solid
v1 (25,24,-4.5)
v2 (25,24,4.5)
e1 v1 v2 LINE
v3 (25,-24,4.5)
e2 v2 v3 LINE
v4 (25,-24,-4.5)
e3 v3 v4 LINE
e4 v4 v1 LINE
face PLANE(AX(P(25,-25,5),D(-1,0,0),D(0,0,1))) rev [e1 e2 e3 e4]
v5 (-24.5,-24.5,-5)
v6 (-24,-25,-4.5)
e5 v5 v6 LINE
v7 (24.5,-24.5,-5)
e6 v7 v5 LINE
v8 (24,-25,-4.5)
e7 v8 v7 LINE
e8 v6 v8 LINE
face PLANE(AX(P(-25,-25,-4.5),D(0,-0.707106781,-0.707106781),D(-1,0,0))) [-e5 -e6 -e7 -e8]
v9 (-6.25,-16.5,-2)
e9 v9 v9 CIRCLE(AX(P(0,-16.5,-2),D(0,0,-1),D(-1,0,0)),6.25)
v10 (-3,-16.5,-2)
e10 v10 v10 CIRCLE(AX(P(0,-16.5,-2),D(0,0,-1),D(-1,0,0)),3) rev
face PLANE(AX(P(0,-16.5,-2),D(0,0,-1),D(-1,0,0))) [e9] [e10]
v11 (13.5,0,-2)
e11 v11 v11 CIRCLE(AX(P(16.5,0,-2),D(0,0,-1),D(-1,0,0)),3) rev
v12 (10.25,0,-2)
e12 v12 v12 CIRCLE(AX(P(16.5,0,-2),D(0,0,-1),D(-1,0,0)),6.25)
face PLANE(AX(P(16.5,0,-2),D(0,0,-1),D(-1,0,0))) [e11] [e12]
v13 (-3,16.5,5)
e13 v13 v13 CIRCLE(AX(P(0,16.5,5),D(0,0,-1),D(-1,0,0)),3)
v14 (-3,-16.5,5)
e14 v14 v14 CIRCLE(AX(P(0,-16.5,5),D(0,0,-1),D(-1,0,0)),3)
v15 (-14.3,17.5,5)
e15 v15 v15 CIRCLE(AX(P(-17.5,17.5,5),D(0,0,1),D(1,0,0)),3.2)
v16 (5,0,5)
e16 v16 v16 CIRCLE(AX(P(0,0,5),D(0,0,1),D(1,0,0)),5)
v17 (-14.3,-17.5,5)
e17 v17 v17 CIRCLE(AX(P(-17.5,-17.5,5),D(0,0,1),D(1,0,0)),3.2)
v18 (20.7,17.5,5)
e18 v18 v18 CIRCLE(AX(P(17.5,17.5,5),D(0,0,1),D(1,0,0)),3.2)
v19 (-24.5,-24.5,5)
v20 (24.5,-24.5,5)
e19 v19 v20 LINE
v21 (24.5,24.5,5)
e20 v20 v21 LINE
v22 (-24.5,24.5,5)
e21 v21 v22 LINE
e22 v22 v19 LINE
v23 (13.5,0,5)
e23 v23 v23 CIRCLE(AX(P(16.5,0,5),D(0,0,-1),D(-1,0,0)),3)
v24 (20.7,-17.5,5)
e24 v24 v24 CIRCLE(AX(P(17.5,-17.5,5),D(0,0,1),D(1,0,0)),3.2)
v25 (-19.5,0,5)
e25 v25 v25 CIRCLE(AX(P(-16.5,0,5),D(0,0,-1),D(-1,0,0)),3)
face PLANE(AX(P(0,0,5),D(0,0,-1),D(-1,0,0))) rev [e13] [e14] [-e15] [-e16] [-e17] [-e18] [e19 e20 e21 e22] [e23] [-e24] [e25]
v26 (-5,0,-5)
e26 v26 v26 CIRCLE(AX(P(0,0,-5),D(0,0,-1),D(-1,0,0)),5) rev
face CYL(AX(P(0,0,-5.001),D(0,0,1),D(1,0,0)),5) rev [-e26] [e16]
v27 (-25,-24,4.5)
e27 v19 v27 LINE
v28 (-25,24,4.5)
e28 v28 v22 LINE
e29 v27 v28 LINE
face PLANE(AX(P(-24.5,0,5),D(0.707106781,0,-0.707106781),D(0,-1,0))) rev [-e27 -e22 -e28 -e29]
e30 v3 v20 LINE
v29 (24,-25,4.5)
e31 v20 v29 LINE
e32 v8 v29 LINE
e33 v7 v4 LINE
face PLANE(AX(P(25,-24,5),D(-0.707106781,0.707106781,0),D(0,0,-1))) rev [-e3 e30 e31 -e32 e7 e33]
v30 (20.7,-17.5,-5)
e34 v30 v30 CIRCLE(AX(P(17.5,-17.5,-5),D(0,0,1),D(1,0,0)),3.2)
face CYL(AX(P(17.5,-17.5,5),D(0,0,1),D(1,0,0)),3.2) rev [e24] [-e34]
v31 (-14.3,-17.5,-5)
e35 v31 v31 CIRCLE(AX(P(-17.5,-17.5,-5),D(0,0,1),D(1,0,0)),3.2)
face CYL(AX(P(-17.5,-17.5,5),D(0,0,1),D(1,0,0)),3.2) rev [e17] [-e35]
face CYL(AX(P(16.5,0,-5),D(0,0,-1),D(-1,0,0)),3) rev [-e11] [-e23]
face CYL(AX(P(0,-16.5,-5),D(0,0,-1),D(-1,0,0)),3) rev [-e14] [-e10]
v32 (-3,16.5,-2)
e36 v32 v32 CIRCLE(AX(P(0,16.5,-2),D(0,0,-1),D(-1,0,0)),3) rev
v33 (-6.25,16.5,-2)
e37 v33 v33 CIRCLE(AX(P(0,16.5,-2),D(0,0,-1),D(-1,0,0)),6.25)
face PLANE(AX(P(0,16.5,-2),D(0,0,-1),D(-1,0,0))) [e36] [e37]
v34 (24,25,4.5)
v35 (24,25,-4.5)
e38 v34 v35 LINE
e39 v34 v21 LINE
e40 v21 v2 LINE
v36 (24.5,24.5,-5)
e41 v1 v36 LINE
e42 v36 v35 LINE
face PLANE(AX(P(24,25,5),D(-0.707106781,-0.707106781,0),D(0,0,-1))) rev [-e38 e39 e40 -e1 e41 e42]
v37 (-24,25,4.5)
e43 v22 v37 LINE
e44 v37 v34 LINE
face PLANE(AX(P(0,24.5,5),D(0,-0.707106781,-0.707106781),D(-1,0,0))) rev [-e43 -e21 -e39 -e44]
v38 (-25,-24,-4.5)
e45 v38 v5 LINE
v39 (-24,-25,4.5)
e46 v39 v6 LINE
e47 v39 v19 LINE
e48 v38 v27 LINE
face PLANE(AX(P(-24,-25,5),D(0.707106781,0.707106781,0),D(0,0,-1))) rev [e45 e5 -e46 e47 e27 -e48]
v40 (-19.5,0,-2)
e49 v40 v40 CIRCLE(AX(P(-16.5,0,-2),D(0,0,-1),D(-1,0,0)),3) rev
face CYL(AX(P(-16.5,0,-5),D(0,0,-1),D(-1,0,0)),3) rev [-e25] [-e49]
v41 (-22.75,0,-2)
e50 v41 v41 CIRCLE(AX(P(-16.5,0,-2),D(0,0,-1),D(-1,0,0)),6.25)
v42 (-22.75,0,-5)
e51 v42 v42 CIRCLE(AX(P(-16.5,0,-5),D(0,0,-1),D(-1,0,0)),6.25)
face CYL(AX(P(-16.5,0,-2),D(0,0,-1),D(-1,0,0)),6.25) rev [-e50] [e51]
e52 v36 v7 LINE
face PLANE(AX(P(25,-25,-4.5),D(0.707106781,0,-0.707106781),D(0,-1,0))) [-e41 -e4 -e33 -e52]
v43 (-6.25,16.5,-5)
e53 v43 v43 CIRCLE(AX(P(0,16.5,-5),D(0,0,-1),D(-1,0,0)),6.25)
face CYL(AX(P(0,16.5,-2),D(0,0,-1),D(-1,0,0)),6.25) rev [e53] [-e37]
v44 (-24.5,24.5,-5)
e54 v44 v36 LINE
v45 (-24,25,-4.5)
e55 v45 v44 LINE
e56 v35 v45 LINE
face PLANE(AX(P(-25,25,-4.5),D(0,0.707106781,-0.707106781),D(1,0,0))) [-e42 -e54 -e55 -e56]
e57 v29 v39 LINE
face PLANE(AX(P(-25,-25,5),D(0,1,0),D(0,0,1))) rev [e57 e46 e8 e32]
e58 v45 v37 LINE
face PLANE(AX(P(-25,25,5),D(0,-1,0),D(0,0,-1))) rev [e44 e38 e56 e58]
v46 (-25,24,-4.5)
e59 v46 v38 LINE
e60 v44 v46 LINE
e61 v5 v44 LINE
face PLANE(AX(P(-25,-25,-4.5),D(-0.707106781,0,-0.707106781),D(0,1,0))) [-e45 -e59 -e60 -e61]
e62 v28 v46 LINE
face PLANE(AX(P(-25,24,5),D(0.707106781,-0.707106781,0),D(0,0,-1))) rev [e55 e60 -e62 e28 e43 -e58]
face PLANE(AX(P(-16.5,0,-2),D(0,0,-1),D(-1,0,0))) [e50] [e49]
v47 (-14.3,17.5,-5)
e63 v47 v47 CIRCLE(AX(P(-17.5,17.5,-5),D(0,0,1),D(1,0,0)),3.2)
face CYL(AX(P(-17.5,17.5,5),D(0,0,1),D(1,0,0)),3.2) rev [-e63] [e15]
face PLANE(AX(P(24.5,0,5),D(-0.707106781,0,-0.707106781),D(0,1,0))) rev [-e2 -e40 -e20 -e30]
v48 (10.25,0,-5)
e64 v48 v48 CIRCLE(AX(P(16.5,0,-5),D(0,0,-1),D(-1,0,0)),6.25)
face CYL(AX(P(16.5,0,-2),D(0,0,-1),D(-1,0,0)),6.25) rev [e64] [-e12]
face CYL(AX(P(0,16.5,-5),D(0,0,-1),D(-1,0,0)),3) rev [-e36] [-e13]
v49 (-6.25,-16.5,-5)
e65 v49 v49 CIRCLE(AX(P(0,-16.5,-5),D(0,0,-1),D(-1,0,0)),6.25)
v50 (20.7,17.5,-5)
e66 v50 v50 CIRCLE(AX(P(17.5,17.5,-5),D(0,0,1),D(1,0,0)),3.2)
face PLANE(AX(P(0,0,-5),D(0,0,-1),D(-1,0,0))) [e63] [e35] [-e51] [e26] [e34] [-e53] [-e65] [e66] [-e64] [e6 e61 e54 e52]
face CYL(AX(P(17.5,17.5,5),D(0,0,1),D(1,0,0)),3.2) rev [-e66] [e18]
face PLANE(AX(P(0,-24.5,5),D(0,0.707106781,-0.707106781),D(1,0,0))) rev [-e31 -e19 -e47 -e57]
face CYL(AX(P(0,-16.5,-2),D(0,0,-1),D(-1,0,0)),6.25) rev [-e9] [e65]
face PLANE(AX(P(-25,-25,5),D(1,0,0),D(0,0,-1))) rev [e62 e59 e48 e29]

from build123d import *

# Parameters (mm, degrees)
SKETCH1_W                = 50
SKETCH1_H                = 50
BOSS_EXTRUDE1_DEPTH      = 5
M6_CLEARANCE_HOLE1_D     = 6.4
CUT_EXTRUDE1_REACH       = 38.742
SKETCH5_R                = 5
CHAMFER1_SIZE            = 1
CHAMFER2_SIZE            = 0.5
F_6_0_6_DIAMETER_HOLE1_D = 6
SKETCH12_R               = 6.25
CUT_EXTRUDE2_DEPTH       = 3


with BuildPart() as part:
    # Sketch1 → Boss-Extrude1 (new, symmetric)
    with BuildSketch(Plane.XY):
        Rectangle(SKETCH1_W, SKETCH1_H)
    extrude(amount=BOSS_EXTRUDE1_DEPTH, both=True)

    # M6 Clearance Hole1 (through all)
    with Locations(Plane.XY.offset(5)):
        with Locations((-17.5, 17.5), (17.5, 17.5), (17.5, -17.5), (-17.5, -17.5)):
            Hole(M6_CLEARANCE_HOLE1_D / 2)

    # Sketch5 → Cut-Extrude1 (cut, up to next)
    with BuildSketch(Plane.XY.offset(5), mode=Mode.PRIVATE) as cut_extrude1_sk1:
        Circle(SKETCH5_R)
    cut_extrude1_tool1 = extrude(cut_extrude1_sk1.sketch, amount=-CUT_EXTRUDE1_REACH, mode=Mode.PRIVATE) & part.part
    add(cut_extrude1_tool1.solids().sort_by_distance((0, 0, 5))[0], mode=Mode.SUBTRACT)

    # Chamfer1
    chamfer1_edges = [part.edges().sort_by_distance(p)[0] for p in [
        (25, -25, 0),
        (-25, -25, 0),
        (-25, 25, 0),
        (25, 25, 0),
    ]]
    chamfer(chamfer1_edges, length=CHAMFER1_SIZE)

    # Chamfer2
    chamfer2_edges = [part.edges().sort_by_distance(p)[0] for p in [
        (0, -25, 5),
        (0, -25, -5),
        (0, 25, -5),
        (0, 25, 5),
        (25, 0, -5),
        (25, 0, 5),
        (-25, 0, -5),
        (-25, 0, 5),
    ]]
    chamfer(chamfer2_edges, length=CHAMFER2_SIZE - 0.0001)  # a hair under: the kernel refuses the full size

    # Ø6.0 (6) Diameter Hole1 (through all)
    with Locations(Plane(origin=(0, 0, -5), x_dir=(-1, 0, 0), z_dir=(0, 0, -1))):
        with Locations((-16.5, 0), (0, 16.5), (16.5, 0), (0, -16.5)):
            Hole(F_6_0_6_DIAMETER_HOLE1_D / 2)

    # Sketch12 → Cut-Extrude2 (cut)
    with BuildSketch(Plane(origin=(0, 0, -5), x_dir=(-1, 0, 0), z_dir=(0, 0, -1))):
        with Locations((16.5, 0)):
            Circle(SKETCH12_R)
        with Locations((0, -16.5)):
            Circle(SKETCH12_R)
        with Locations((-16.5, 0)):
            Circle(SKETCH12_R)
        with Locations((0, 16.5)):
            Circle(SKETCH12_R)
    extrude(amount=-CUT_EXTRUDE2_DEPTH, mode=Mode.SUBTRACT)


solid = part.part
